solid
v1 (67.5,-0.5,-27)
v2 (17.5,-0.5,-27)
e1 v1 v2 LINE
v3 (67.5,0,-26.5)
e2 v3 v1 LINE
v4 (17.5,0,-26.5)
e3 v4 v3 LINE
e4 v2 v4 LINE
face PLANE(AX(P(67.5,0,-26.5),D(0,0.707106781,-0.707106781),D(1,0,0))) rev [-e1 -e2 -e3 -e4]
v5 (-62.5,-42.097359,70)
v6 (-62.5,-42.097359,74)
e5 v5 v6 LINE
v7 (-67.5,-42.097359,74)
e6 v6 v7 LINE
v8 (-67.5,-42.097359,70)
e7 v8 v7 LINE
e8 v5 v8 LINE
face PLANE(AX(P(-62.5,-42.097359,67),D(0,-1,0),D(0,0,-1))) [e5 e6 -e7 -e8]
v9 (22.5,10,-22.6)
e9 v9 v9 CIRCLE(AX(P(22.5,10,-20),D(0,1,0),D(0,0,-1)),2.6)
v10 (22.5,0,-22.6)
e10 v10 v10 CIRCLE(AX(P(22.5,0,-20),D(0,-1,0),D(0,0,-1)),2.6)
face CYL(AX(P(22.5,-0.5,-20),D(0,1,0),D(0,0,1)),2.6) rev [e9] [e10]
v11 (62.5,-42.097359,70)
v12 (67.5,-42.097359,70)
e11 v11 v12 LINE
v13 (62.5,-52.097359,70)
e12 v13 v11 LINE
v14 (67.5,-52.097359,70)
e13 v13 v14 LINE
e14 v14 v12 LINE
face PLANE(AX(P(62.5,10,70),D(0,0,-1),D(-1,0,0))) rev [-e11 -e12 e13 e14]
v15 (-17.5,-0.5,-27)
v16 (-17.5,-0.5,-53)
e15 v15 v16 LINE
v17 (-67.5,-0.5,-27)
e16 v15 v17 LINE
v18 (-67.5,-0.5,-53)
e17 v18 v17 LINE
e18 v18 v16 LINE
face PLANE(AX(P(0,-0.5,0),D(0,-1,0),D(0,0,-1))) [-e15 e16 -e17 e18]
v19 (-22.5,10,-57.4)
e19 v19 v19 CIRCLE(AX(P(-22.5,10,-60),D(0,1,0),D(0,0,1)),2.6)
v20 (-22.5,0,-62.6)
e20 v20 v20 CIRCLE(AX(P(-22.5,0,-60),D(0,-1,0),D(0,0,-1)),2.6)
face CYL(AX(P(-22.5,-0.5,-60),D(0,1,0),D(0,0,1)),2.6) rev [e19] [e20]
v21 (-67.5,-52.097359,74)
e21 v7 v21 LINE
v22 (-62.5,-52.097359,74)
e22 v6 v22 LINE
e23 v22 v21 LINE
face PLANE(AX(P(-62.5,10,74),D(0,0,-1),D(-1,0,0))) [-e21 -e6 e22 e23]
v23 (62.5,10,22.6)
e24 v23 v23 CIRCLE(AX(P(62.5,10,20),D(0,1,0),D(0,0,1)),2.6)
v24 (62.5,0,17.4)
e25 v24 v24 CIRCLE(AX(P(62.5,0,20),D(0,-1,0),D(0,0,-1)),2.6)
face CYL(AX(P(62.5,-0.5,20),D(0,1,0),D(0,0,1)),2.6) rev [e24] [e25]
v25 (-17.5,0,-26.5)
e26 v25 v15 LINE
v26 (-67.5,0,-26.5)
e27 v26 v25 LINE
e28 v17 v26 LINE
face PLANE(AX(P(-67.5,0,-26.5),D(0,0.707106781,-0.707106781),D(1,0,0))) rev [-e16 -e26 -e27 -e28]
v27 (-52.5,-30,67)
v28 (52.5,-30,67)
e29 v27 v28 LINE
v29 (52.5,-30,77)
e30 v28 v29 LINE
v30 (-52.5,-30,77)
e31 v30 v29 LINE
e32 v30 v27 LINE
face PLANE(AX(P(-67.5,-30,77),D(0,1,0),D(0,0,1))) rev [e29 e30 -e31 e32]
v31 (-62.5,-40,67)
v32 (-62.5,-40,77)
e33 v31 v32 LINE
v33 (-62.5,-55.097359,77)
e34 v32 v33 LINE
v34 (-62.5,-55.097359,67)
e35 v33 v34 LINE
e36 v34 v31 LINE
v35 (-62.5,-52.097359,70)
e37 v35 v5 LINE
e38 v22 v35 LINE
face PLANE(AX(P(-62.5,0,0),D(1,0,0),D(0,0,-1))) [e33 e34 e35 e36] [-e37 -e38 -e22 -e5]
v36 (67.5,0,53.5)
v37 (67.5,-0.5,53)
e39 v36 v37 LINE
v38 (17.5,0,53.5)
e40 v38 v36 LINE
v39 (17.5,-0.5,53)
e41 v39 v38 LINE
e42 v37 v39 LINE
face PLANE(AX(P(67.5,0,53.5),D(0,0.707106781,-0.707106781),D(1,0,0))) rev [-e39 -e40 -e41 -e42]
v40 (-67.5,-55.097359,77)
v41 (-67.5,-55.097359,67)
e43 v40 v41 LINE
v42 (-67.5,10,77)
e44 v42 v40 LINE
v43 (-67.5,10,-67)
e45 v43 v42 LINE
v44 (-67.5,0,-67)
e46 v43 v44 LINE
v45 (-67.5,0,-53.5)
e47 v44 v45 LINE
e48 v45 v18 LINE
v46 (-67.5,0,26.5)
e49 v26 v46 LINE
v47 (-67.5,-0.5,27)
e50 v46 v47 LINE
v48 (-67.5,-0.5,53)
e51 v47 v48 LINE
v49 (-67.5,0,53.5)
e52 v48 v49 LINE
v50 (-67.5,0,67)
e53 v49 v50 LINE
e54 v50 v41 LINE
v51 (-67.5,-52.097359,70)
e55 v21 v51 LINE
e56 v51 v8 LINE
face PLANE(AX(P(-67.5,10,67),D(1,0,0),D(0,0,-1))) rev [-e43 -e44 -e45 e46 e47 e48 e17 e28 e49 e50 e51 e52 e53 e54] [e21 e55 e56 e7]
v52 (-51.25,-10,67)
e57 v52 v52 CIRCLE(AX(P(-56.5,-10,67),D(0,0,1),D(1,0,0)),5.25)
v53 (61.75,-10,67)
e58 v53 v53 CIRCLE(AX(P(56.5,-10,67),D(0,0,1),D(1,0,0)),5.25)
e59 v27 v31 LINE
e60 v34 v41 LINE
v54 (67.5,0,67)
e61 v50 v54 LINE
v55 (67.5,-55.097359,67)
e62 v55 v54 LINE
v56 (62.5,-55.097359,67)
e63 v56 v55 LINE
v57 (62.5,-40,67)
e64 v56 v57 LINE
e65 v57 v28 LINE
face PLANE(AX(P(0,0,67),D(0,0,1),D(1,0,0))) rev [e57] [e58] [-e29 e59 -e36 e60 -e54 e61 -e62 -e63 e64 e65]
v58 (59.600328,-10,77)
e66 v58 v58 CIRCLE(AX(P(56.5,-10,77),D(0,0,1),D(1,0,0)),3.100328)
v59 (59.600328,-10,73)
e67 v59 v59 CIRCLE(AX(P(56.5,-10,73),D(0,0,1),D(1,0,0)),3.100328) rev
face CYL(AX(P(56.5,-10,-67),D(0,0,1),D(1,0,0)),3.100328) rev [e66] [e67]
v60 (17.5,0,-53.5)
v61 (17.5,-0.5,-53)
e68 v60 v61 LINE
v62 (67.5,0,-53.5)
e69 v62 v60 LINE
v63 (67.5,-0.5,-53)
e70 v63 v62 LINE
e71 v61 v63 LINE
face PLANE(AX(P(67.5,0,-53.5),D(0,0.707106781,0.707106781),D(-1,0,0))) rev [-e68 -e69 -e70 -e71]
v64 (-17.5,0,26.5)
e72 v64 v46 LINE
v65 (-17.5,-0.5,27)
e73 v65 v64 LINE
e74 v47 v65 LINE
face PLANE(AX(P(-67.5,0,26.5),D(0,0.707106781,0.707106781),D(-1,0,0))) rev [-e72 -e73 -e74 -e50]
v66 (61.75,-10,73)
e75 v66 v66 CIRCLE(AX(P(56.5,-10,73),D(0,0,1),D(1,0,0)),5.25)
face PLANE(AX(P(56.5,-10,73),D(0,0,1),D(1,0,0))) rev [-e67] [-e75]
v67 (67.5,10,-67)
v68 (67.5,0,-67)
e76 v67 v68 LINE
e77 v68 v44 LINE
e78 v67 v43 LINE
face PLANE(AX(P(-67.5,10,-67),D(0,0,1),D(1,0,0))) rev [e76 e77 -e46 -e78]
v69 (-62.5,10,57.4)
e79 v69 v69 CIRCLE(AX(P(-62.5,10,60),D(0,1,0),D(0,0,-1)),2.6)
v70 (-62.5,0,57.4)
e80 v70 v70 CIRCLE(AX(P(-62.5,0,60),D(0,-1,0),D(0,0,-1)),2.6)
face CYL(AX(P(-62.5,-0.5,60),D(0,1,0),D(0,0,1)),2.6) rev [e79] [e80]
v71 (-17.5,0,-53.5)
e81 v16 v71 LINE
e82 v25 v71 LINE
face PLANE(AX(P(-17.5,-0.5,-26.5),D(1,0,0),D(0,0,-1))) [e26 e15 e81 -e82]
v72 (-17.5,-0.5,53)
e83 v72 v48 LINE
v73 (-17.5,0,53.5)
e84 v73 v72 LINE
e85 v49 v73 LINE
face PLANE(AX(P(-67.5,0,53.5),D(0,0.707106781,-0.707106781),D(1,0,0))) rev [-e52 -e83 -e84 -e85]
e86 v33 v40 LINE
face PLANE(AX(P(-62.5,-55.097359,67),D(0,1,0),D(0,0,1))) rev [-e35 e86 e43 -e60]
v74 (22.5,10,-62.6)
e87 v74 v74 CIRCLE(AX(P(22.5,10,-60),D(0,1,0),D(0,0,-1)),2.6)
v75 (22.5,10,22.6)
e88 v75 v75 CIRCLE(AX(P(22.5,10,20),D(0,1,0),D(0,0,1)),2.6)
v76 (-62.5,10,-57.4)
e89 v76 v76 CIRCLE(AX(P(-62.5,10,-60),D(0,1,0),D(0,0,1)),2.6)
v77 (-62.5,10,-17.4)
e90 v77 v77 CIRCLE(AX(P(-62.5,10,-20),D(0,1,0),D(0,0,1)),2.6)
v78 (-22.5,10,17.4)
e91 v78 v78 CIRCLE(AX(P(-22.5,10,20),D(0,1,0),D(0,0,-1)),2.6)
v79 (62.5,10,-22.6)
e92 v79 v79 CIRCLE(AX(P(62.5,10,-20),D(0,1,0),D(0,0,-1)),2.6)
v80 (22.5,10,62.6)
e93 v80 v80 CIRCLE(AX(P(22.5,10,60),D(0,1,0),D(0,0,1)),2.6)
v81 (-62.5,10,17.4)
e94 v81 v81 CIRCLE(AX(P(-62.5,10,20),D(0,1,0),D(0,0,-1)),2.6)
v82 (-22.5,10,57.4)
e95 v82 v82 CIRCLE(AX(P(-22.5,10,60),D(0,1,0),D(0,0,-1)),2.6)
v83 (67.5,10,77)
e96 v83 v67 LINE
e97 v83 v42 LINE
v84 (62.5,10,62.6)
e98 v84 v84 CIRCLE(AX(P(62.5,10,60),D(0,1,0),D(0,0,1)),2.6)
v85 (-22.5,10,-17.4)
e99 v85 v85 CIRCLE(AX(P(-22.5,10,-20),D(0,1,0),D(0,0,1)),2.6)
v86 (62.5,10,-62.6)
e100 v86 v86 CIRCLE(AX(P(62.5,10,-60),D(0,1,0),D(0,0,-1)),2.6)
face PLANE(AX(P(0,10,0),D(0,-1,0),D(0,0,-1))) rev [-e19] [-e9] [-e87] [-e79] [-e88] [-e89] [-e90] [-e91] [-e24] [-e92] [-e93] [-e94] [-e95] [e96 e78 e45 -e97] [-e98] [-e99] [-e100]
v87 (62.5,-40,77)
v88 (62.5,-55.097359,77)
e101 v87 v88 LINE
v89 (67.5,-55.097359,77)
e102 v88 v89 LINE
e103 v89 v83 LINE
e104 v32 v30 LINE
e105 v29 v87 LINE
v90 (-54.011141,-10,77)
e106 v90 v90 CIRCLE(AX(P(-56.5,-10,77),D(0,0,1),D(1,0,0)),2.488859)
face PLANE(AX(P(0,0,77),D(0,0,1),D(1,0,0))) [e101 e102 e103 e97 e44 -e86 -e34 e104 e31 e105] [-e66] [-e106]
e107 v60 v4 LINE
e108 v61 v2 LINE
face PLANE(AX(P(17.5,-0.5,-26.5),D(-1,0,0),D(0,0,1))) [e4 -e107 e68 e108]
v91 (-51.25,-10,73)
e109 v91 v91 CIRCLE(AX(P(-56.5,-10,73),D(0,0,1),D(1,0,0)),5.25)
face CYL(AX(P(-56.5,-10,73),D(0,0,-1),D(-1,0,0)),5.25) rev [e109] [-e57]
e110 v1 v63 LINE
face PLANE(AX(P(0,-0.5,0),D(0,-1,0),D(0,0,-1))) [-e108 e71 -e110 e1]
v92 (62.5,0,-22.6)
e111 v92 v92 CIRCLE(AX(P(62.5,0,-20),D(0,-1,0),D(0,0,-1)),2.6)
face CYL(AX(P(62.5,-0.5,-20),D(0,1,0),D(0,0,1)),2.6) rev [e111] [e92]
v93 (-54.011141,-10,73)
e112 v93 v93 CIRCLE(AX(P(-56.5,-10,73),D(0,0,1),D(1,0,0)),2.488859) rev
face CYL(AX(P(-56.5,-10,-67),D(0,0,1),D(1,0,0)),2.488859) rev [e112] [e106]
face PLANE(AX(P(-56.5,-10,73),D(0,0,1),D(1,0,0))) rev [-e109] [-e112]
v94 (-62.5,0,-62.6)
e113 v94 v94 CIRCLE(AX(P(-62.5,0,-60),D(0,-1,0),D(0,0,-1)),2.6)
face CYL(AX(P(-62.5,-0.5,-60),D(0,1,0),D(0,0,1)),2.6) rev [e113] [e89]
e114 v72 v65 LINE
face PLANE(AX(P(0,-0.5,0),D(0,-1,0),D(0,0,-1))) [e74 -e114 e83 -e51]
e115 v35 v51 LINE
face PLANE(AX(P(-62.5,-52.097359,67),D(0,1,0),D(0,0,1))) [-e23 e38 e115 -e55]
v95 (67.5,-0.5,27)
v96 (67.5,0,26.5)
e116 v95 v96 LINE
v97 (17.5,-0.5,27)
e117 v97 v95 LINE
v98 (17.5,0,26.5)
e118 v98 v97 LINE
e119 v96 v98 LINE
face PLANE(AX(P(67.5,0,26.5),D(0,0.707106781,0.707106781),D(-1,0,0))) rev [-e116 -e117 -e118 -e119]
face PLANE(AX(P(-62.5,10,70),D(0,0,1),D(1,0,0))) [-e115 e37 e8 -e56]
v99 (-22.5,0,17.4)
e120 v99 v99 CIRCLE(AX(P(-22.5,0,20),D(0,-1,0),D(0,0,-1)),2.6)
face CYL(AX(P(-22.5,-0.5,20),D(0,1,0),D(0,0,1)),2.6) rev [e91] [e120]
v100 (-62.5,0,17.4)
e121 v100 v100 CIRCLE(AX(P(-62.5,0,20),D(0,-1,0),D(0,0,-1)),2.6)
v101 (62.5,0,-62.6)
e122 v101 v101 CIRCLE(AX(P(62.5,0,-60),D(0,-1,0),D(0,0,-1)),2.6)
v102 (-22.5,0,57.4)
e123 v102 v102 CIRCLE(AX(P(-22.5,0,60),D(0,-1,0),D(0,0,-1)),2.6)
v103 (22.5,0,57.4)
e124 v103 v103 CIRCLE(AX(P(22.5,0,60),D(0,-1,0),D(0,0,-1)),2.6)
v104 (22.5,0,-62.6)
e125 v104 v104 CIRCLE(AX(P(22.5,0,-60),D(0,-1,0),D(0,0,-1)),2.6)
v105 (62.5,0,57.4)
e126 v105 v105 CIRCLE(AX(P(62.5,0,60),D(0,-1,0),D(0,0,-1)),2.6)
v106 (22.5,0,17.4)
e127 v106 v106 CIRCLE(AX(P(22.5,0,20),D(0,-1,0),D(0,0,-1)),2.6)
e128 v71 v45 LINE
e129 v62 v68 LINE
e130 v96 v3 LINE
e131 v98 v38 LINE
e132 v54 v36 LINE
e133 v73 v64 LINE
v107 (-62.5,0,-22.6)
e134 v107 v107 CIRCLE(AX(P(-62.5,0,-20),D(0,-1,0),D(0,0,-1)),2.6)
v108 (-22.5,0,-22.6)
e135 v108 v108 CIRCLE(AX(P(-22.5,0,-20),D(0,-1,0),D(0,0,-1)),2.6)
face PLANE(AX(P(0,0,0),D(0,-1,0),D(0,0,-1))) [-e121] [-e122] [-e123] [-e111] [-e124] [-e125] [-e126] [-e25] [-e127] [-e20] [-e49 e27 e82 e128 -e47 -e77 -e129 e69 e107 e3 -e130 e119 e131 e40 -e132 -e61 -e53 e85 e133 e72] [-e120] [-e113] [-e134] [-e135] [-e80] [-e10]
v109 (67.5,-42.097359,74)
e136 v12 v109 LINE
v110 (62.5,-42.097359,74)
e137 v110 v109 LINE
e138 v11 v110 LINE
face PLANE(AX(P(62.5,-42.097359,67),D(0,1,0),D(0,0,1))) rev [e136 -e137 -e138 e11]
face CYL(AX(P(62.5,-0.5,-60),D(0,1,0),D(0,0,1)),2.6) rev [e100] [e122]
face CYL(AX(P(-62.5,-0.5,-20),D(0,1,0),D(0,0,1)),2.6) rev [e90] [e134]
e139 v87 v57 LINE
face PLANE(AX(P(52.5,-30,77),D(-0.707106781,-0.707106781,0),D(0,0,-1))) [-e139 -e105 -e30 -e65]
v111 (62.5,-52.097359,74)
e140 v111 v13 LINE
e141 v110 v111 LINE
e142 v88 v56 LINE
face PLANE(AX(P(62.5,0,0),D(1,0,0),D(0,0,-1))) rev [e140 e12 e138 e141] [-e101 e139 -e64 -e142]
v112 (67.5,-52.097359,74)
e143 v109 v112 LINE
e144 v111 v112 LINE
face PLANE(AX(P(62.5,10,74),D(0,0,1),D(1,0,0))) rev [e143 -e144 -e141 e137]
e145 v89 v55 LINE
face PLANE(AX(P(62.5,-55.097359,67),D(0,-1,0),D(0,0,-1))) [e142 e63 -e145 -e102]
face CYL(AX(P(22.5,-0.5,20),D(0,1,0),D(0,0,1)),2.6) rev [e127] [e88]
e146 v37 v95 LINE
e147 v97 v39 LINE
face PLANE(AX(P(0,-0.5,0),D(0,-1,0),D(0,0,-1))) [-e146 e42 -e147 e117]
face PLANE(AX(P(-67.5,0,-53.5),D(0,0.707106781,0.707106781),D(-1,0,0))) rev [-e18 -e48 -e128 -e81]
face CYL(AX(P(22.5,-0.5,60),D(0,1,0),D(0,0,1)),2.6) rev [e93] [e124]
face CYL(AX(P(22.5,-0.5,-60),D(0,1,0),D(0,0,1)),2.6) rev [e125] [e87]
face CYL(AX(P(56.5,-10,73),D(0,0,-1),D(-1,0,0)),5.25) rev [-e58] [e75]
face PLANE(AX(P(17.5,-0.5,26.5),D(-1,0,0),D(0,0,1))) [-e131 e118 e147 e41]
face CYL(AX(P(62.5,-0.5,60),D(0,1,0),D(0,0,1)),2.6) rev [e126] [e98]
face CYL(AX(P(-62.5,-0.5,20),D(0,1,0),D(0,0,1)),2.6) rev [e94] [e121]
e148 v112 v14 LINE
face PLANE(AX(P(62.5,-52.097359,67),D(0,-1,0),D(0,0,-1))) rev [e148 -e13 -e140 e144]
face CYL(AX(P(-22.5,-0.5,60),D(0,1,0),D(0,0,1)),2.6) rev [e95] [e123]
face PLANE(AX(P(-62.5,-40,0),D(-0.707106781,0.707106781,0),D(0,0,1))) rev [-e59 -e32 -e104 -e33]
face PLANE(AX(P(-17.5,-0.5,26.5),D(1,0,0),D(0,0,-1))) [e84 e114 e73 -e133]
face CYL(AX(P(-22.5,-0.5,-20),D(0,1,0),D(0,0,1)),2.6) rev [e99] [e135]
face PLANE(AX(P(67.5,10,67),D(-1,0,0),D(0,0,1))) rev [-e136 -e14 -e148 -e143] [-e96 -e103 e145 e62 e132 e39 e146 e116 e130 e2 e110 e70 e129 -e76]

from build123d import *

# Parameters (mm, degrees)
SKETCH1_W               = 135
SKETCH1_H               = 134
BOSS_EXTRUDE1_DEPTH     = 10
SKETCH2_W               = 50
SKETCH2_H               = 27
BOSS_EXTRUDE2_DEPTH     = 0.5
CUT_EXTRUDE1_DEPTH      = 96.630800478
CUT_EXTRUDE1_DEPTH_BACK = 96.630800478
SKETCH3_R               = 2.6
BOSS_EXTRUDE3_START     = 67
SKETCH4_W               = 135
SKETCH4_H               = 40
BOSS_EXTRUDE3_DEPTH     = 10
CUT_EXTRUDE2_DEPTH      = 107.701686959
CUT_EXTRUDE2_DEPTH_BACK = 184.701686959
CUT_EXTRUDE2_START      = 77
SKETCH5_R               = 2.488859202
SKETCH5_R_2             = 3.1003276
CHAMFER1_SIZE           = 0.5
CUT_EXTRUDE3_START      = 67
SKETCH6_R               = 5.25
CUT_EXTRUDE3_DEPTH      = 6
BOSS_EXTRUDE4_START     = -67.5
SKETCH7_W               = 10
SKETCH7_H               = 25.09735907
SKETCH7_W_2             = 4
SKETCH7_H_2             = 10
BOSS_EXTRUDE4_DEPTH     = 5
BOSS_EXTRUDE5_START     = 67.5
SKETCH7_2_W             = 10
SKETCH7_2_H             = 25.09735907
SKETCH7_2_W_2           = 4
SKETCH7_2_H_2           = 10
BOSS_EXTRUDE5_DEPTH     = 5
CHAMFER2_SIZE           = 10


with BuildPart() as part:
    # Sketch1 → Boss-Extrude1 (new body)
    with BuildSketch(Plane(origin=(0, 0, 0), x_dir=(1, 0, 0), z_dir=(0, 1, 0))):
        Rectangle(SKETCH1_W, SKETCH1_H)
    extrude(amount=BOSS_EXTRUDE1_DEPTH)

    # Sketch2 → Boss-Extrude2 (add)
    with BuildSketch(Plane(origin=(0, 0, 0), x_dir=(1, 0, 0), z_dir=(0, 1, 0))):
        with Locations((-42.5, 40)):
            Rectangle(SKETCH2_W, SKETCH2_H)
        with Locations((-42.5, -40)):
            Rectangle(SKETCH2_W, SKETCH2_H)
        with Locations((42.5, -40)):
            Rectangle(SKETCH2_W, SKETCH2_H)
        with Locations((42.5, 40)):
            Rectangle(SKETCH2_W, SKETCH2_H)
    extrude(amount=-BOSS_EXTRUDE2_DEPTH)

    # Sketch3 → Cut-Extrude1 (cut, two sides: drawn at the far end of the back side and taken through both)
    with BuildSketch(Plane(origin=(0, 0, 0), x_dir=(1, 0, 0), z_dir=(0, 1, 0)).offset(-CUT_EXTRUDE1_DEPTH_BACK)):
        with Locations(Location((-62.5, 20, 0), (0, 0, 270))):
            Circle(SKETCH3_R)
        with Locations(Location((-22.5, 20, 0), (0, 0, 270))):
            Circle(SKETCH3_R)
        with Locations(Location((-22.5, 60, 0), (0, 0, 270))):
            Circle(SKETCH3_R)
        with Locations(Location((-62.5, 60, 0), (0, 0, 270))):
            Circle(SKETCH3_R)
        with Locations(Location((-62.5, -60, 0), (0, 0, 90))):
            Circle(SKETCH3_R)
        with Locations(Location((-22.5, -60, 0), (0, 0, 90))):
            Circle(SKETCH3_R)
        with Locations(Location((-22.5, -20, 0), (0, 0, 90))):
            Circle(SKETCH3_R)
        with Locations(Location((-62.5, -20, 0), (0, 0, 90))):
            Circle(SKETCH3_R)
        with Locations(Location((62.5, -20, 0), (0, 0, 270))):
            Circle(SKETCH3_R)
        with Locations(Location((22.5, -20, 0), (0, 0, 270))):
            Circle(SKETCH3_R)
        with Locations(Location((22.5, -60, 0), (0, 0, 270))):
            Circle(SKETCH3_R)
        with Locations(Location((62.5, -60, 0), (0, 0, 270))):
            Circle(SKETCH3_R)
        with Locations(Location((62.5, 60, 0), (0, 0, 90))):
            Circle(SKETCH3_R)
        with Locations(Location((22.5, 60, 0), (0, 0, 90))):
            Circle(SKETCH3_R)
        with Locations(Location((22.5, 20, 0), (0, 0, 90))):
            Circle(SKETCH3_R)
        with Locations(Location((62.5, 20, 0), (0, 0, 90))):
            Circle(SKETCH3_R)
    extrude(amount=CUT_EXTRUDE1_DEPTH + CUT_EXTRUDE1_DEPTH_BACK, mode=Mode.SUBTRACT)

    # Sketch4 → Boss-Extrude3 (add)
    with BuildSketch(Plane.XY.offset(BOSS_EXTRUDE3_START)):
        with Locations((0, -10)):
            Rectangle(SKETCH4_W, SKETCH4_H)
    extrude(amount=BOSS_EXTRUDE3_DEPTH)

    # Sketch5 → Cut-Extrude2 (cut, two sides: drawn at the far end of the back side and taken through both)
    with BuildSketch(Plane.XY.offset(CUT_EXTRUDE2_START - CUT_EXTRUDE2_DEPTH_BACK)):
        with Locations((-56.5, -10)):
            Circle(SKETCH5_R)
        with Locations((56.5, -10)):
            Circle(SKETCH5_R_2)
    extrude(amount=CUT_EXTRUDE2_DEPTH + CUT_EXTRUDE2_DEPTH_BACK, mode=Mode.SUBTRACT)

    # Chamfer1
    chamfer1_edges = [part.edges().sort_by_distance(p)[0] for p in [
        (42.5, -0.5, 26.5),
        (42.5, -0.5, 53.5),
        (-42.5, -0.5, 53.5),
        (-42.5, -0.5, 26.5),
        (-42.5, -0.5, -53.5),
        (-42.5, -0.5, -26.5),
        (42.5, -0.5, -26.5),
        (42.5, -0.5, -53.5),
    ]]
    chamfer(chamfer1_edges, length=CHAMFER1_SIZE - 0.0001)  # a hair under: the kernel refuses the full size

    # Sketch6 → Cut-Extrude3 (cut)
    with BuildSketch(Plane.XY.offset(CUT_EXTRUDE3_START)):
        with Locations((56.5, -10)):
            Circle(SKETCH6_R)
        with Locations((-56.5, -10)):
            Circle(SKETCH6_R)
    extrude(amount=CUT_EXTRUDE3_DEPTH, mode=Mode.SUBTRACT)

    # Sketch7 → Boss-Extrude4 (add)
    with BuildSketch(Plane(origin=(0, 0, 0), x_dir=(0, 0, -1), z_dir=(1, 0, 0)).offset(BOSS_EXTRUDE4_START)):
        with Locations((-72, -42.548679535)):
            Rectangle(SKETCH7_W, SKETCH7_H)
        with Locations((-72, -47.09735907)):
            Rectangle(SKETCH7_W_2, SKETCH7_H_2, mode=Mode.SUBTRACT)
    extrude(amount=BOSS_EXTRUDE4_DEPTH)

    # Sketch7<2> → Boss-Extrude5 (add)
    with BuildSketch(Plane(origin=(0, 0, 0), x_dir=(0, 0, -1), z_dir=(1, 0, 0)).offset(BOSS_EXTRUDE5_START)):
        with Locations((-72, -42.548679535)):
            Rectangle(SKETCH7_2_W, SKETCH7_2_H)
        with Locations((-72, -47.09735907)):
            Rectangle(SKETCH7_2_W_2, SKETCH7_2_H_2, mode=Mode.SUBTRACT)
    extrude(amount=-BOSS_EXTRUDE5_DEPTH)

    # Chamfer2
    chamfer2_edges = [part.edges().sort_by_distance(p)[0] for p in [
        (-62.5, -30, 72),
        (62.5, -30, 72),
    ]]
    chamfer(chamfer2_edges, length=CHAMFER2_SIZE)


solid = part.part
